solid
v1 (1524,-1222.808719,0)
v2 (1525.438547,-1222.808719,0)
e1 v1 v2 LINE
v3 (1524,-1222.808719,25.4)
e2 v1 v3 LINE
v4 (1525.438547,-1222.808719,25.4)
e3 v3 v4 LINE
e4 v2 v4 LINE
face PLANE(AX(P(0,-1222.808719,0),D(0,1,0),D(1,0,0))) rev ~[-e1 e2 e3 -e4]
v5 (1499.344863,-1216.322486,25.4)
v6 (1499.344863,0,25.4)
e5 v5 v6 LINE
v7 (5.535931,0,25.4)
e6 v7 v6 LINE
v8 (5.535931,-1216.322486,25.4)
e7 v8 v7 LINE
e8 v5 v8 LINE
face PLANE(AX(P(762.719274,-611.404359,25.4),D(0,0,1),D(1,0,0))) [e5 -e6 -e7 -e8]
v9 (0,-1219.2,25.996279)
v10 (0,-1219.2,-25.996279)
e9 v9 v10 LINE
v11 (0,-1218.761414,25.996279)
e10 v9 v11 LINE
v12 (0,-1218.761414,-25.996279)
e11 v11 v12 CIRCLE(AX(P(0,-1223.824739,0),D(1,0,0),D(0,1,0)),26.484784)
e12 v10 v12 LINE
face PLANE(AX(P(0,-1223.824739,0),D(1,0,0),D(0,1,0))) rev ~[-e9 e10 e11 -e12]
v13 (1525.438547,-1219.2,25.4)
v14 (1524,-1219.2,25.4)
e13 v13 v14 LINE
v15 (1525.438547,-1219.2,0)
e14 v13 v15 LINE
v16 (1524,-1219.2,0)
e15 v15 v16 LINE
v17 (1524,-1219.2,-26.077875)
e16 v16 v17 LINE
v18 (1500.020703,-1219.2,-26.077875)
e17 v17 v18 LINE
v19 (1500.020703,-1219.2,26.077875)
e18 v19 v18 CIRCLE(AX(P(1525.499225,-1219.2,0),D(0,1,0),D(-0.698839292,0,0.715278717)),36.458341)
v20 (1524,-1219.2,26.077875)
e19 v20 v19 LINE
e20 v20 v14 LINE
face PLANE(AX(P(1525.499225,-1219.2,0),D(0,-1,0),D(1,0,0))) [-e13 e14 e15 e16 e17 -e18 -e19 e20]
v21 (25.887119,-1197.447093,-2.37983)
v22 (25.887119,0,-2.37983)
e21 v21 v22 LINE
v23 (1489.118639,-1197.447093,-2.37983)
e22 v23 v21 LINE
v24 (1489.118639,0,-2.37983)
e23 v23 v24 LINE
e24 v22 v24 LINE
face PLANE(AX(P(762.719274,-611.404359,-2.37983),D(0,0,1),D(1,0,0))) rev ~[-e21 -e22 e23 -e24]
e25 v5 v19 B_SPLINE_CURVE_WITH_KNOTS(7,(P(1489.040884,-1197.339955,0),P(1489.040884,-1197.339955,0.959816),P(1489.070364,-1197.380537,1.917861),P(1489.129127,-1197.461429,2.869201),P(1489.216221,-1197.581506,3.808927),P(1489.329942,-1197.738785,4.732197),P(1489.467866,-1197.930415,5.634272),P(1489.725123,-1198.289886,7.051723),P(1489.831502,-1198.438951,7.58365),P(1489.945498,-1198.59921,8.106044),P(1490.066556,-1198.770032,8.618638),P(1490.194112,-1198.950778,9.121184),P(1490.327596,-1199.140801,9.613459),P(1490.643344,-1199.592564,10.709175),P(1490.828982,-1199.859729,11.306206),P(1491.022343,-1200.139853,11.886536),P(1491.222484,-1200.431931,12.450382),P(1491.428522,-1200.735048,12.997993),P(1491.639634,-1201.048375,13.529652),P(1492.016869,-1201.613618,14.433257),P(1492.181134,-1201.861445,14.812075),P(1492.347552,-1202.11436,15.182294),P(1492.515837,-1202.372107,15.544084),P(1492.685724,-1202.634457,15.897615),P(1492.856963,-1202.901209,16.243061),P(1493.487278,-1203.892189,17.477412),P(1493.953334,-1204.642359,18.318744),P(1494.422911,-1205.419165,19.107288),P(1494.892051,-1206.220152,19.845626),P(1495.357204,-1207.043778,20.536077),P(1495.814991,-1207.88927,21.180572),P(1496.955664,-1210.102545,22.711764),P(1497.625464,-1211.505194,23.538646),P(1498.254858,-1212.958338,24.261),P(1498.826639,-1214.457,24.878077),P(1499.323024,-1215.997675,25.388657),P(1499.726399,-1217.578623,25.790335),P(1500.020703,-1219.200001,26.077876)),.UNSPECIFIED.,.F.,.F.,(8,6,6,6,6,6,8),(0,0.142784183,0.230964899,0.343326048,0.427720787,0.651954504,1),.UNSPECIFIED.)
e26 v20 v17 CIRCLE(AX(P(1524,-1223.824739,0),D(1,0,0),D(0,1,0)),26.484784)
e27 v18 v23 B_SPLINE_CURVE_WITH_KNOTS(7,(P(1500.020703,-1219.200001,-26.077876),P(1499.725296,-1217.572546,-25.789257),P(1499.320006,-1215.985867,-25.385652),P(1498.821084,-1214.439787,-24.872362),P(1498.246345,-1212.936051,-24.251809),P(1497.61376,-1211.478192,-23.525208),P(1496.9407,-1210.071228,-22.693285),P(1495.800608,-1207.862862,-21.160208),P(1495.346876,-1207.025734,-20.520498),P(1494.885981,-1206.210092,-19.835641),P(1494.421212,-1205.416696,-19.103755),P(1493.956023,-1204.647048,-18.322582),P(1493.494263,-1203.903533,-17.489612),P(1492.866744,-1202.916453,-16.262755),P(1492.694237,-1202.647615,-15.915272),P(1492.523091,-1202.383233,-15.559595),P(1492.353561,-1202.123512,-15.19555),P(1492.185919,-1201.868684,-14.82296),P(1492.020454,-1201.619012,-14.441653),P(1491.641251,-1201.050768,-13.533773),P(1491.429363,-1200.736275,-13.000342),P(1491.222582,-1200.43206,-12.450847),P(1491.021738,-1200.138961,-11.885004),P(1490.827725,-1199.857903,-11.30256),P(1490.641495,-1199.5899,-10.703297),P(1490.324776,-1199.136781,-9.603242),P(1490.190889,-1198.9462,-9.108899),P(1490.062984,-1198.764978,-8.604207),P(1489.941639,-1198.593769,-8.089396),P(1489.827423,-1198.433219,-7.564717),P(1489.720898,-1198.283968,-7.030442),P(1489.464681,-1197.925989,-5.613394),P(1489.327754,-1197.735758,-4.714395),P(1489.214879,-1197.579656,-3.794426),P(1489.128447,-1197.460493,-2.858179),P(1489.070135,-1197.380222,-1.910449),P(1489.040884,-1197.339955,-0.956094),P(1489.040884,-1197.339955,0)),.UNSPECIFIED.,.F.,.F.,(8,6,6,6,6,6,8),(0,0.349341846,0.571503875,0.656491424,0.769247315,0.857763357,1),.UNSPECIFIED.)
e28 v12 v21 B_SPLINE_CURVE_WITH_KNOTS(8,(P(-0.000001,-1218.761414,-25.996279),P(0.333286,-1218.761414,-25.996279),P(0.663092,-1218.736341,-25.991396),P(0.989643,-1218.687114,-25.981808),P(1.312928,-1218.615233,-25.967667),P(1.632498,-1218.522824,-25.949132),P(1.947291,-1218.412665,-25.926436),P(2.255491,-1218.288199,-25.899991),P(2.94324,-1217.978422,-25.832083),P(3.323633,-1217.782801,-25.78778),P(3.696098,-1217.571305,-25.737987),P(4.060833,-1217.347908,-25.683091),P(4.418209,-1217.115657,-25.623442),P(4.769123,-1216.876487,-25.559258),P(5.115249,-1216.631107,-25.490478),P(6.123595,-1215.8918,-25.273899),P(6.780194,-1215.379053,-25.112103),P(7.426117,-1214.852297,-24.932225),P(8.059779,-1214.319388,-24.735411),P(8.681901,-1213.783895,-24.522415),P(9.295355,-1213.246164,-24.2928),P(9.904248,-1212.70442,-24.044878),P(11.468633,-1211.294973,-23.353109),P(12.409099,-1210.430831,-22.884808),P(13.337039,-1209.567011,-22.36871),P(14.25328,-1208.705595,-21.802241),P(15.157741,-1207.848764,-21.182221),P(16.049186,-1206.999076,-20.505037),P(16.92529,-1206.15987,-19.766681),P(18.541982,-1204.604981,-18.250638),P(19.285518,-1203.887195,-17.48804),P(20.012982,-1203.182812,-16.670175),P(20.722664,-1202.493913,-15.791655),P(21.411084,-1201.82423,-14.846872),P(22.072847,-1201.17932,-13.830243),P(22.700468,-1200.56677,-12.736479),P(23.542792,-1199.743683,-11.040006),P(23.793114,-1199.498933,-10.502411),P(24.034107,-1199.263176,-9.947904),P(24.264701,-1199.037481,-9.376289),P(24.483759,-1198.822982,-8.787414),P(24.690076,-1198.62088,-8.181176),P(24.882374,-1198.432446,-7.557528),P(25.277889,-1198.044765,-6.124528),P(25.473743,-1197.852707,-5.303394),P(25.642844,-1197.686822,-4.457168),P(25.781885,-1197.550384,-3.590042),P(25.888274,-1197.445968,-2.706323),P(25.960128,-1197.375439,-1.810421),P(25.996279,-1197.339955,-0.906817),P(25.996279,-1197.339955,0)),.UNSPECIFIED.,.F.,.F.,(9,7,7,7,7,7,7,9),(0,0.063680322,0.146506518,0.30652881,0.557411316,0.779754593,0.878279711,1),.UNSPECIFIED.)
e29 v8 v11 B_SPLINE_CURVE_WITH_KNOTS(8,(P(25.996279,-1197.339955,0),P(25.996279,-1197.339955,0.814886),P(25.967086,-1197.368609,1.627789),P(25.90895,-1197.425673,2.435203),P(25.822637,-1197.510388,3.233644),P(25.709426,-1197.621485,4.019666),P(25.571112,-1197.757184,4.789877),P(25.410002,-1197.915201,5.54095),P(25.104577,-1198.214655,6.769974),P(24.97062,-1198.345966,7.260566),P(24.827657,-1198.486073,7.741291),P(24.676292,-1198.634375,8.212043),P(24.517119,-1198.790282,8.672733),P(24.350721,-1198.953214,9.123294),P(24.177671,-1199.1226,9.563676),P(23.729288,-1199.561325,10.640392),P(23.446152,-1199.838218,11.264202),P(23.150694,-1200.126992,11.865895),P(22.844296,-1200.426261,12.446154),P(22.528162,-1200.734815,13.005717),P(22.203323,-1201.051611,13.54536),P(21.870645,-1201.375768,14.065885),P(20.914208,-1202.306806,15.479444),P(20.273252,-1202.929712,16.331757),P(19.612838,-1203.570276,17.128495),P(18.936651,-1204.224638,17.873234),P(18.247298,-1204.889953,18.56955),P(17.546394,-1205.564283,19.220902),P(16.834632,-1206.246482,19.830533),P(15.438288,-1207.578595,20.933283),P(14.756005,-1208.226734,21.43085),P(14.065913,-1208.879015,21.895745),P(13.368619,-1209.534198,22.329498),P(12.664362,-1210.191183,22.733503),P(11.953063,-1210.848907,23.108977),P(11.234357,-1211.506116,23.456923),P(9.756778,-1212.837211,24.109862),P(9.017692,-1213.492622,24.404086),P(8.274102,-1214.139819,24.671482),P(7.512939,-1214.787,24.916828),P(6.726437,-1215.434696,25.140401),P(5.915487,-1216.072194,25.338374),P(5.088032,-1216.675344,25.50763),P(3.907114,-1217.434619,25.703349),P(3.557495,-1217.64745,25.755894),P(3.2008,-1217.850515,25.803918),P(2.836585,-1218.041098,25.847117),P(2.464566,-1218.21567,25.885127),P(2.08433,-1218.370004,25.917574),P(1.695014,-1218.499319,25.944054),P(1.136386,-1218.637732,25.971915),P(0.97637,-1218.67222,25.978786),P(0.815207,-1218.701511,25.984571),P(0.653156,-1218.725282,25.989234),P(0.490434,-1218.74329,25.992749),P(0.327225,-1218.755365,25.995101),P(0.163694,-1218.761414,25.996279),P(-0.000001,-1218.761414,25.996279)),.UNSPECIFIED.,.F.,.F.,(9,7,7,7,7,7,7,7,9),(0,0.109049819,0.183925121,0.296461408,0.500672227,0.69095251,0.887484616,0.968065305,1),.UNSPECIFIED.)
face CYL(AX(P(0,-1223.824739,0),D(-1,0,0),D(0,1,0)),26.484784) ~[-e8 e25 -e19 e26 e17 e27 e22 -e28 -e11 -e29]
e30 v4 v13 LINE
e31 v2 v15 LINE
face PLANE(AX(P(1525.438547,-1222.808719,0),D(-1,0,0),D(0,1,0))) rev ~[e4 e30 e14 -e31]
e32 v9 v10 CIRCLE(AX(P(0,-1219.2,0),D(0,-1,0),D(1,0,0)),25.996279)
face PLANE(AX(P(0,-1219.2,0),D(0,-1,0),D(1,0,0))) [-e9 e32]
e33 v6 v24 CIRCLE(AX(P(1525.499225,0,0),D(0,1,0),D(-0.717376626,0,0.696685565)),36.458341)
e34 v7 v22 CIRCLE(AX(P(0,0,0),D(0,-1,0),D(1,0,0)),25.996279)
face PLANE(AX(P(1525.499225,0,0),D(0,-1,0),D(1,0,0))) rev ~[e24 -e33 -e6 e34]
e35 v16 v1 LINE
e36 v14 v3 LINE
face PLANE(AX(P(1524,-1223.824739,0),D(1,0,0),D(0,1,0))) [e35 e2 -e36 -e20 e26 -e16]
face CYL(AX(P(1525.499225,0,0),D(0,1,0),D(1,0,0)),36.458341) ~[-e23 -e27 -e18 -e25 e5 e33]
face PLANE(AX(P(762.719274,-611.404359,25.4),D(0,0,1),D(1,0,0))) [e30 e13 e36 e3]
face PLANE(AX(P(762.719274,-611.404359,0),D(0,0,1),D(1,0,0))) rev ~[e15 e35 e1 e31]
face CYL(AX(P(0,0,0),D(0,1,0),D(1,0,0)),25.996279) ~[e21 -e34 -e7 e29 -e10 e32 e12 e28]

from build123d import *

# Parameters (mm, degrees)
F2_R      = 25.9962792711
F3_DEPTH  = 1219.2
F4_R      = 26.4847844062
F5_DEPTH  = 1524
F6_R      = 36.4583411444
F7_DEPTH  = 1219.2
F8_W      = 1525.4385471344
F8_H      = 1222.8087186813
F9_DEPTH  = 25.4
F15_DEPTH = 27.77983


# Not quite as in the source:
# - the program builds the solid bodies; features that only make, move or delete a surface that nothing else refers to are left out


with BuildPart() as f3:
    # F2 (on Front) → F3 (new body)
    with BuildSketch(Plane.XZ):
        Circle(F2_R)
    extrude(amount=F3_DEPTH)

    # F4 (on Right) → F5 (join)
    with BuildSketch(Plane.YZ):
        with Locations((-1223.8247394562, 0)):
            Circle(F4_R)
    extrude(amount=F5_DEPTH)

    # F6 (on Front) → F7 (join)
    with BuildSketch(Plane.XZ):
        with Locations((1525.4992246628, 0)):
            Circle(F6_R)
    extrude(amount=F7_DEPTH)

    # F8 (on Top) → F9 (join)
    with BuildSketch(Plane.XY):
        with Locations((762.7192735672, -611.4043593407)):
            Rectangle(F8_W, F8_H)
    extrude(amount=F9_DEPTH)

    # F15 (add): a face of the model
    f15_faces = [f3.faces().sort_by_distance(p)[0] for p in [
        (752.4403971283, -608.161243113, 25.4),
    ]]
    extrude(f15_faces, amount=-F15_DEPTH)


solid = f3.part
